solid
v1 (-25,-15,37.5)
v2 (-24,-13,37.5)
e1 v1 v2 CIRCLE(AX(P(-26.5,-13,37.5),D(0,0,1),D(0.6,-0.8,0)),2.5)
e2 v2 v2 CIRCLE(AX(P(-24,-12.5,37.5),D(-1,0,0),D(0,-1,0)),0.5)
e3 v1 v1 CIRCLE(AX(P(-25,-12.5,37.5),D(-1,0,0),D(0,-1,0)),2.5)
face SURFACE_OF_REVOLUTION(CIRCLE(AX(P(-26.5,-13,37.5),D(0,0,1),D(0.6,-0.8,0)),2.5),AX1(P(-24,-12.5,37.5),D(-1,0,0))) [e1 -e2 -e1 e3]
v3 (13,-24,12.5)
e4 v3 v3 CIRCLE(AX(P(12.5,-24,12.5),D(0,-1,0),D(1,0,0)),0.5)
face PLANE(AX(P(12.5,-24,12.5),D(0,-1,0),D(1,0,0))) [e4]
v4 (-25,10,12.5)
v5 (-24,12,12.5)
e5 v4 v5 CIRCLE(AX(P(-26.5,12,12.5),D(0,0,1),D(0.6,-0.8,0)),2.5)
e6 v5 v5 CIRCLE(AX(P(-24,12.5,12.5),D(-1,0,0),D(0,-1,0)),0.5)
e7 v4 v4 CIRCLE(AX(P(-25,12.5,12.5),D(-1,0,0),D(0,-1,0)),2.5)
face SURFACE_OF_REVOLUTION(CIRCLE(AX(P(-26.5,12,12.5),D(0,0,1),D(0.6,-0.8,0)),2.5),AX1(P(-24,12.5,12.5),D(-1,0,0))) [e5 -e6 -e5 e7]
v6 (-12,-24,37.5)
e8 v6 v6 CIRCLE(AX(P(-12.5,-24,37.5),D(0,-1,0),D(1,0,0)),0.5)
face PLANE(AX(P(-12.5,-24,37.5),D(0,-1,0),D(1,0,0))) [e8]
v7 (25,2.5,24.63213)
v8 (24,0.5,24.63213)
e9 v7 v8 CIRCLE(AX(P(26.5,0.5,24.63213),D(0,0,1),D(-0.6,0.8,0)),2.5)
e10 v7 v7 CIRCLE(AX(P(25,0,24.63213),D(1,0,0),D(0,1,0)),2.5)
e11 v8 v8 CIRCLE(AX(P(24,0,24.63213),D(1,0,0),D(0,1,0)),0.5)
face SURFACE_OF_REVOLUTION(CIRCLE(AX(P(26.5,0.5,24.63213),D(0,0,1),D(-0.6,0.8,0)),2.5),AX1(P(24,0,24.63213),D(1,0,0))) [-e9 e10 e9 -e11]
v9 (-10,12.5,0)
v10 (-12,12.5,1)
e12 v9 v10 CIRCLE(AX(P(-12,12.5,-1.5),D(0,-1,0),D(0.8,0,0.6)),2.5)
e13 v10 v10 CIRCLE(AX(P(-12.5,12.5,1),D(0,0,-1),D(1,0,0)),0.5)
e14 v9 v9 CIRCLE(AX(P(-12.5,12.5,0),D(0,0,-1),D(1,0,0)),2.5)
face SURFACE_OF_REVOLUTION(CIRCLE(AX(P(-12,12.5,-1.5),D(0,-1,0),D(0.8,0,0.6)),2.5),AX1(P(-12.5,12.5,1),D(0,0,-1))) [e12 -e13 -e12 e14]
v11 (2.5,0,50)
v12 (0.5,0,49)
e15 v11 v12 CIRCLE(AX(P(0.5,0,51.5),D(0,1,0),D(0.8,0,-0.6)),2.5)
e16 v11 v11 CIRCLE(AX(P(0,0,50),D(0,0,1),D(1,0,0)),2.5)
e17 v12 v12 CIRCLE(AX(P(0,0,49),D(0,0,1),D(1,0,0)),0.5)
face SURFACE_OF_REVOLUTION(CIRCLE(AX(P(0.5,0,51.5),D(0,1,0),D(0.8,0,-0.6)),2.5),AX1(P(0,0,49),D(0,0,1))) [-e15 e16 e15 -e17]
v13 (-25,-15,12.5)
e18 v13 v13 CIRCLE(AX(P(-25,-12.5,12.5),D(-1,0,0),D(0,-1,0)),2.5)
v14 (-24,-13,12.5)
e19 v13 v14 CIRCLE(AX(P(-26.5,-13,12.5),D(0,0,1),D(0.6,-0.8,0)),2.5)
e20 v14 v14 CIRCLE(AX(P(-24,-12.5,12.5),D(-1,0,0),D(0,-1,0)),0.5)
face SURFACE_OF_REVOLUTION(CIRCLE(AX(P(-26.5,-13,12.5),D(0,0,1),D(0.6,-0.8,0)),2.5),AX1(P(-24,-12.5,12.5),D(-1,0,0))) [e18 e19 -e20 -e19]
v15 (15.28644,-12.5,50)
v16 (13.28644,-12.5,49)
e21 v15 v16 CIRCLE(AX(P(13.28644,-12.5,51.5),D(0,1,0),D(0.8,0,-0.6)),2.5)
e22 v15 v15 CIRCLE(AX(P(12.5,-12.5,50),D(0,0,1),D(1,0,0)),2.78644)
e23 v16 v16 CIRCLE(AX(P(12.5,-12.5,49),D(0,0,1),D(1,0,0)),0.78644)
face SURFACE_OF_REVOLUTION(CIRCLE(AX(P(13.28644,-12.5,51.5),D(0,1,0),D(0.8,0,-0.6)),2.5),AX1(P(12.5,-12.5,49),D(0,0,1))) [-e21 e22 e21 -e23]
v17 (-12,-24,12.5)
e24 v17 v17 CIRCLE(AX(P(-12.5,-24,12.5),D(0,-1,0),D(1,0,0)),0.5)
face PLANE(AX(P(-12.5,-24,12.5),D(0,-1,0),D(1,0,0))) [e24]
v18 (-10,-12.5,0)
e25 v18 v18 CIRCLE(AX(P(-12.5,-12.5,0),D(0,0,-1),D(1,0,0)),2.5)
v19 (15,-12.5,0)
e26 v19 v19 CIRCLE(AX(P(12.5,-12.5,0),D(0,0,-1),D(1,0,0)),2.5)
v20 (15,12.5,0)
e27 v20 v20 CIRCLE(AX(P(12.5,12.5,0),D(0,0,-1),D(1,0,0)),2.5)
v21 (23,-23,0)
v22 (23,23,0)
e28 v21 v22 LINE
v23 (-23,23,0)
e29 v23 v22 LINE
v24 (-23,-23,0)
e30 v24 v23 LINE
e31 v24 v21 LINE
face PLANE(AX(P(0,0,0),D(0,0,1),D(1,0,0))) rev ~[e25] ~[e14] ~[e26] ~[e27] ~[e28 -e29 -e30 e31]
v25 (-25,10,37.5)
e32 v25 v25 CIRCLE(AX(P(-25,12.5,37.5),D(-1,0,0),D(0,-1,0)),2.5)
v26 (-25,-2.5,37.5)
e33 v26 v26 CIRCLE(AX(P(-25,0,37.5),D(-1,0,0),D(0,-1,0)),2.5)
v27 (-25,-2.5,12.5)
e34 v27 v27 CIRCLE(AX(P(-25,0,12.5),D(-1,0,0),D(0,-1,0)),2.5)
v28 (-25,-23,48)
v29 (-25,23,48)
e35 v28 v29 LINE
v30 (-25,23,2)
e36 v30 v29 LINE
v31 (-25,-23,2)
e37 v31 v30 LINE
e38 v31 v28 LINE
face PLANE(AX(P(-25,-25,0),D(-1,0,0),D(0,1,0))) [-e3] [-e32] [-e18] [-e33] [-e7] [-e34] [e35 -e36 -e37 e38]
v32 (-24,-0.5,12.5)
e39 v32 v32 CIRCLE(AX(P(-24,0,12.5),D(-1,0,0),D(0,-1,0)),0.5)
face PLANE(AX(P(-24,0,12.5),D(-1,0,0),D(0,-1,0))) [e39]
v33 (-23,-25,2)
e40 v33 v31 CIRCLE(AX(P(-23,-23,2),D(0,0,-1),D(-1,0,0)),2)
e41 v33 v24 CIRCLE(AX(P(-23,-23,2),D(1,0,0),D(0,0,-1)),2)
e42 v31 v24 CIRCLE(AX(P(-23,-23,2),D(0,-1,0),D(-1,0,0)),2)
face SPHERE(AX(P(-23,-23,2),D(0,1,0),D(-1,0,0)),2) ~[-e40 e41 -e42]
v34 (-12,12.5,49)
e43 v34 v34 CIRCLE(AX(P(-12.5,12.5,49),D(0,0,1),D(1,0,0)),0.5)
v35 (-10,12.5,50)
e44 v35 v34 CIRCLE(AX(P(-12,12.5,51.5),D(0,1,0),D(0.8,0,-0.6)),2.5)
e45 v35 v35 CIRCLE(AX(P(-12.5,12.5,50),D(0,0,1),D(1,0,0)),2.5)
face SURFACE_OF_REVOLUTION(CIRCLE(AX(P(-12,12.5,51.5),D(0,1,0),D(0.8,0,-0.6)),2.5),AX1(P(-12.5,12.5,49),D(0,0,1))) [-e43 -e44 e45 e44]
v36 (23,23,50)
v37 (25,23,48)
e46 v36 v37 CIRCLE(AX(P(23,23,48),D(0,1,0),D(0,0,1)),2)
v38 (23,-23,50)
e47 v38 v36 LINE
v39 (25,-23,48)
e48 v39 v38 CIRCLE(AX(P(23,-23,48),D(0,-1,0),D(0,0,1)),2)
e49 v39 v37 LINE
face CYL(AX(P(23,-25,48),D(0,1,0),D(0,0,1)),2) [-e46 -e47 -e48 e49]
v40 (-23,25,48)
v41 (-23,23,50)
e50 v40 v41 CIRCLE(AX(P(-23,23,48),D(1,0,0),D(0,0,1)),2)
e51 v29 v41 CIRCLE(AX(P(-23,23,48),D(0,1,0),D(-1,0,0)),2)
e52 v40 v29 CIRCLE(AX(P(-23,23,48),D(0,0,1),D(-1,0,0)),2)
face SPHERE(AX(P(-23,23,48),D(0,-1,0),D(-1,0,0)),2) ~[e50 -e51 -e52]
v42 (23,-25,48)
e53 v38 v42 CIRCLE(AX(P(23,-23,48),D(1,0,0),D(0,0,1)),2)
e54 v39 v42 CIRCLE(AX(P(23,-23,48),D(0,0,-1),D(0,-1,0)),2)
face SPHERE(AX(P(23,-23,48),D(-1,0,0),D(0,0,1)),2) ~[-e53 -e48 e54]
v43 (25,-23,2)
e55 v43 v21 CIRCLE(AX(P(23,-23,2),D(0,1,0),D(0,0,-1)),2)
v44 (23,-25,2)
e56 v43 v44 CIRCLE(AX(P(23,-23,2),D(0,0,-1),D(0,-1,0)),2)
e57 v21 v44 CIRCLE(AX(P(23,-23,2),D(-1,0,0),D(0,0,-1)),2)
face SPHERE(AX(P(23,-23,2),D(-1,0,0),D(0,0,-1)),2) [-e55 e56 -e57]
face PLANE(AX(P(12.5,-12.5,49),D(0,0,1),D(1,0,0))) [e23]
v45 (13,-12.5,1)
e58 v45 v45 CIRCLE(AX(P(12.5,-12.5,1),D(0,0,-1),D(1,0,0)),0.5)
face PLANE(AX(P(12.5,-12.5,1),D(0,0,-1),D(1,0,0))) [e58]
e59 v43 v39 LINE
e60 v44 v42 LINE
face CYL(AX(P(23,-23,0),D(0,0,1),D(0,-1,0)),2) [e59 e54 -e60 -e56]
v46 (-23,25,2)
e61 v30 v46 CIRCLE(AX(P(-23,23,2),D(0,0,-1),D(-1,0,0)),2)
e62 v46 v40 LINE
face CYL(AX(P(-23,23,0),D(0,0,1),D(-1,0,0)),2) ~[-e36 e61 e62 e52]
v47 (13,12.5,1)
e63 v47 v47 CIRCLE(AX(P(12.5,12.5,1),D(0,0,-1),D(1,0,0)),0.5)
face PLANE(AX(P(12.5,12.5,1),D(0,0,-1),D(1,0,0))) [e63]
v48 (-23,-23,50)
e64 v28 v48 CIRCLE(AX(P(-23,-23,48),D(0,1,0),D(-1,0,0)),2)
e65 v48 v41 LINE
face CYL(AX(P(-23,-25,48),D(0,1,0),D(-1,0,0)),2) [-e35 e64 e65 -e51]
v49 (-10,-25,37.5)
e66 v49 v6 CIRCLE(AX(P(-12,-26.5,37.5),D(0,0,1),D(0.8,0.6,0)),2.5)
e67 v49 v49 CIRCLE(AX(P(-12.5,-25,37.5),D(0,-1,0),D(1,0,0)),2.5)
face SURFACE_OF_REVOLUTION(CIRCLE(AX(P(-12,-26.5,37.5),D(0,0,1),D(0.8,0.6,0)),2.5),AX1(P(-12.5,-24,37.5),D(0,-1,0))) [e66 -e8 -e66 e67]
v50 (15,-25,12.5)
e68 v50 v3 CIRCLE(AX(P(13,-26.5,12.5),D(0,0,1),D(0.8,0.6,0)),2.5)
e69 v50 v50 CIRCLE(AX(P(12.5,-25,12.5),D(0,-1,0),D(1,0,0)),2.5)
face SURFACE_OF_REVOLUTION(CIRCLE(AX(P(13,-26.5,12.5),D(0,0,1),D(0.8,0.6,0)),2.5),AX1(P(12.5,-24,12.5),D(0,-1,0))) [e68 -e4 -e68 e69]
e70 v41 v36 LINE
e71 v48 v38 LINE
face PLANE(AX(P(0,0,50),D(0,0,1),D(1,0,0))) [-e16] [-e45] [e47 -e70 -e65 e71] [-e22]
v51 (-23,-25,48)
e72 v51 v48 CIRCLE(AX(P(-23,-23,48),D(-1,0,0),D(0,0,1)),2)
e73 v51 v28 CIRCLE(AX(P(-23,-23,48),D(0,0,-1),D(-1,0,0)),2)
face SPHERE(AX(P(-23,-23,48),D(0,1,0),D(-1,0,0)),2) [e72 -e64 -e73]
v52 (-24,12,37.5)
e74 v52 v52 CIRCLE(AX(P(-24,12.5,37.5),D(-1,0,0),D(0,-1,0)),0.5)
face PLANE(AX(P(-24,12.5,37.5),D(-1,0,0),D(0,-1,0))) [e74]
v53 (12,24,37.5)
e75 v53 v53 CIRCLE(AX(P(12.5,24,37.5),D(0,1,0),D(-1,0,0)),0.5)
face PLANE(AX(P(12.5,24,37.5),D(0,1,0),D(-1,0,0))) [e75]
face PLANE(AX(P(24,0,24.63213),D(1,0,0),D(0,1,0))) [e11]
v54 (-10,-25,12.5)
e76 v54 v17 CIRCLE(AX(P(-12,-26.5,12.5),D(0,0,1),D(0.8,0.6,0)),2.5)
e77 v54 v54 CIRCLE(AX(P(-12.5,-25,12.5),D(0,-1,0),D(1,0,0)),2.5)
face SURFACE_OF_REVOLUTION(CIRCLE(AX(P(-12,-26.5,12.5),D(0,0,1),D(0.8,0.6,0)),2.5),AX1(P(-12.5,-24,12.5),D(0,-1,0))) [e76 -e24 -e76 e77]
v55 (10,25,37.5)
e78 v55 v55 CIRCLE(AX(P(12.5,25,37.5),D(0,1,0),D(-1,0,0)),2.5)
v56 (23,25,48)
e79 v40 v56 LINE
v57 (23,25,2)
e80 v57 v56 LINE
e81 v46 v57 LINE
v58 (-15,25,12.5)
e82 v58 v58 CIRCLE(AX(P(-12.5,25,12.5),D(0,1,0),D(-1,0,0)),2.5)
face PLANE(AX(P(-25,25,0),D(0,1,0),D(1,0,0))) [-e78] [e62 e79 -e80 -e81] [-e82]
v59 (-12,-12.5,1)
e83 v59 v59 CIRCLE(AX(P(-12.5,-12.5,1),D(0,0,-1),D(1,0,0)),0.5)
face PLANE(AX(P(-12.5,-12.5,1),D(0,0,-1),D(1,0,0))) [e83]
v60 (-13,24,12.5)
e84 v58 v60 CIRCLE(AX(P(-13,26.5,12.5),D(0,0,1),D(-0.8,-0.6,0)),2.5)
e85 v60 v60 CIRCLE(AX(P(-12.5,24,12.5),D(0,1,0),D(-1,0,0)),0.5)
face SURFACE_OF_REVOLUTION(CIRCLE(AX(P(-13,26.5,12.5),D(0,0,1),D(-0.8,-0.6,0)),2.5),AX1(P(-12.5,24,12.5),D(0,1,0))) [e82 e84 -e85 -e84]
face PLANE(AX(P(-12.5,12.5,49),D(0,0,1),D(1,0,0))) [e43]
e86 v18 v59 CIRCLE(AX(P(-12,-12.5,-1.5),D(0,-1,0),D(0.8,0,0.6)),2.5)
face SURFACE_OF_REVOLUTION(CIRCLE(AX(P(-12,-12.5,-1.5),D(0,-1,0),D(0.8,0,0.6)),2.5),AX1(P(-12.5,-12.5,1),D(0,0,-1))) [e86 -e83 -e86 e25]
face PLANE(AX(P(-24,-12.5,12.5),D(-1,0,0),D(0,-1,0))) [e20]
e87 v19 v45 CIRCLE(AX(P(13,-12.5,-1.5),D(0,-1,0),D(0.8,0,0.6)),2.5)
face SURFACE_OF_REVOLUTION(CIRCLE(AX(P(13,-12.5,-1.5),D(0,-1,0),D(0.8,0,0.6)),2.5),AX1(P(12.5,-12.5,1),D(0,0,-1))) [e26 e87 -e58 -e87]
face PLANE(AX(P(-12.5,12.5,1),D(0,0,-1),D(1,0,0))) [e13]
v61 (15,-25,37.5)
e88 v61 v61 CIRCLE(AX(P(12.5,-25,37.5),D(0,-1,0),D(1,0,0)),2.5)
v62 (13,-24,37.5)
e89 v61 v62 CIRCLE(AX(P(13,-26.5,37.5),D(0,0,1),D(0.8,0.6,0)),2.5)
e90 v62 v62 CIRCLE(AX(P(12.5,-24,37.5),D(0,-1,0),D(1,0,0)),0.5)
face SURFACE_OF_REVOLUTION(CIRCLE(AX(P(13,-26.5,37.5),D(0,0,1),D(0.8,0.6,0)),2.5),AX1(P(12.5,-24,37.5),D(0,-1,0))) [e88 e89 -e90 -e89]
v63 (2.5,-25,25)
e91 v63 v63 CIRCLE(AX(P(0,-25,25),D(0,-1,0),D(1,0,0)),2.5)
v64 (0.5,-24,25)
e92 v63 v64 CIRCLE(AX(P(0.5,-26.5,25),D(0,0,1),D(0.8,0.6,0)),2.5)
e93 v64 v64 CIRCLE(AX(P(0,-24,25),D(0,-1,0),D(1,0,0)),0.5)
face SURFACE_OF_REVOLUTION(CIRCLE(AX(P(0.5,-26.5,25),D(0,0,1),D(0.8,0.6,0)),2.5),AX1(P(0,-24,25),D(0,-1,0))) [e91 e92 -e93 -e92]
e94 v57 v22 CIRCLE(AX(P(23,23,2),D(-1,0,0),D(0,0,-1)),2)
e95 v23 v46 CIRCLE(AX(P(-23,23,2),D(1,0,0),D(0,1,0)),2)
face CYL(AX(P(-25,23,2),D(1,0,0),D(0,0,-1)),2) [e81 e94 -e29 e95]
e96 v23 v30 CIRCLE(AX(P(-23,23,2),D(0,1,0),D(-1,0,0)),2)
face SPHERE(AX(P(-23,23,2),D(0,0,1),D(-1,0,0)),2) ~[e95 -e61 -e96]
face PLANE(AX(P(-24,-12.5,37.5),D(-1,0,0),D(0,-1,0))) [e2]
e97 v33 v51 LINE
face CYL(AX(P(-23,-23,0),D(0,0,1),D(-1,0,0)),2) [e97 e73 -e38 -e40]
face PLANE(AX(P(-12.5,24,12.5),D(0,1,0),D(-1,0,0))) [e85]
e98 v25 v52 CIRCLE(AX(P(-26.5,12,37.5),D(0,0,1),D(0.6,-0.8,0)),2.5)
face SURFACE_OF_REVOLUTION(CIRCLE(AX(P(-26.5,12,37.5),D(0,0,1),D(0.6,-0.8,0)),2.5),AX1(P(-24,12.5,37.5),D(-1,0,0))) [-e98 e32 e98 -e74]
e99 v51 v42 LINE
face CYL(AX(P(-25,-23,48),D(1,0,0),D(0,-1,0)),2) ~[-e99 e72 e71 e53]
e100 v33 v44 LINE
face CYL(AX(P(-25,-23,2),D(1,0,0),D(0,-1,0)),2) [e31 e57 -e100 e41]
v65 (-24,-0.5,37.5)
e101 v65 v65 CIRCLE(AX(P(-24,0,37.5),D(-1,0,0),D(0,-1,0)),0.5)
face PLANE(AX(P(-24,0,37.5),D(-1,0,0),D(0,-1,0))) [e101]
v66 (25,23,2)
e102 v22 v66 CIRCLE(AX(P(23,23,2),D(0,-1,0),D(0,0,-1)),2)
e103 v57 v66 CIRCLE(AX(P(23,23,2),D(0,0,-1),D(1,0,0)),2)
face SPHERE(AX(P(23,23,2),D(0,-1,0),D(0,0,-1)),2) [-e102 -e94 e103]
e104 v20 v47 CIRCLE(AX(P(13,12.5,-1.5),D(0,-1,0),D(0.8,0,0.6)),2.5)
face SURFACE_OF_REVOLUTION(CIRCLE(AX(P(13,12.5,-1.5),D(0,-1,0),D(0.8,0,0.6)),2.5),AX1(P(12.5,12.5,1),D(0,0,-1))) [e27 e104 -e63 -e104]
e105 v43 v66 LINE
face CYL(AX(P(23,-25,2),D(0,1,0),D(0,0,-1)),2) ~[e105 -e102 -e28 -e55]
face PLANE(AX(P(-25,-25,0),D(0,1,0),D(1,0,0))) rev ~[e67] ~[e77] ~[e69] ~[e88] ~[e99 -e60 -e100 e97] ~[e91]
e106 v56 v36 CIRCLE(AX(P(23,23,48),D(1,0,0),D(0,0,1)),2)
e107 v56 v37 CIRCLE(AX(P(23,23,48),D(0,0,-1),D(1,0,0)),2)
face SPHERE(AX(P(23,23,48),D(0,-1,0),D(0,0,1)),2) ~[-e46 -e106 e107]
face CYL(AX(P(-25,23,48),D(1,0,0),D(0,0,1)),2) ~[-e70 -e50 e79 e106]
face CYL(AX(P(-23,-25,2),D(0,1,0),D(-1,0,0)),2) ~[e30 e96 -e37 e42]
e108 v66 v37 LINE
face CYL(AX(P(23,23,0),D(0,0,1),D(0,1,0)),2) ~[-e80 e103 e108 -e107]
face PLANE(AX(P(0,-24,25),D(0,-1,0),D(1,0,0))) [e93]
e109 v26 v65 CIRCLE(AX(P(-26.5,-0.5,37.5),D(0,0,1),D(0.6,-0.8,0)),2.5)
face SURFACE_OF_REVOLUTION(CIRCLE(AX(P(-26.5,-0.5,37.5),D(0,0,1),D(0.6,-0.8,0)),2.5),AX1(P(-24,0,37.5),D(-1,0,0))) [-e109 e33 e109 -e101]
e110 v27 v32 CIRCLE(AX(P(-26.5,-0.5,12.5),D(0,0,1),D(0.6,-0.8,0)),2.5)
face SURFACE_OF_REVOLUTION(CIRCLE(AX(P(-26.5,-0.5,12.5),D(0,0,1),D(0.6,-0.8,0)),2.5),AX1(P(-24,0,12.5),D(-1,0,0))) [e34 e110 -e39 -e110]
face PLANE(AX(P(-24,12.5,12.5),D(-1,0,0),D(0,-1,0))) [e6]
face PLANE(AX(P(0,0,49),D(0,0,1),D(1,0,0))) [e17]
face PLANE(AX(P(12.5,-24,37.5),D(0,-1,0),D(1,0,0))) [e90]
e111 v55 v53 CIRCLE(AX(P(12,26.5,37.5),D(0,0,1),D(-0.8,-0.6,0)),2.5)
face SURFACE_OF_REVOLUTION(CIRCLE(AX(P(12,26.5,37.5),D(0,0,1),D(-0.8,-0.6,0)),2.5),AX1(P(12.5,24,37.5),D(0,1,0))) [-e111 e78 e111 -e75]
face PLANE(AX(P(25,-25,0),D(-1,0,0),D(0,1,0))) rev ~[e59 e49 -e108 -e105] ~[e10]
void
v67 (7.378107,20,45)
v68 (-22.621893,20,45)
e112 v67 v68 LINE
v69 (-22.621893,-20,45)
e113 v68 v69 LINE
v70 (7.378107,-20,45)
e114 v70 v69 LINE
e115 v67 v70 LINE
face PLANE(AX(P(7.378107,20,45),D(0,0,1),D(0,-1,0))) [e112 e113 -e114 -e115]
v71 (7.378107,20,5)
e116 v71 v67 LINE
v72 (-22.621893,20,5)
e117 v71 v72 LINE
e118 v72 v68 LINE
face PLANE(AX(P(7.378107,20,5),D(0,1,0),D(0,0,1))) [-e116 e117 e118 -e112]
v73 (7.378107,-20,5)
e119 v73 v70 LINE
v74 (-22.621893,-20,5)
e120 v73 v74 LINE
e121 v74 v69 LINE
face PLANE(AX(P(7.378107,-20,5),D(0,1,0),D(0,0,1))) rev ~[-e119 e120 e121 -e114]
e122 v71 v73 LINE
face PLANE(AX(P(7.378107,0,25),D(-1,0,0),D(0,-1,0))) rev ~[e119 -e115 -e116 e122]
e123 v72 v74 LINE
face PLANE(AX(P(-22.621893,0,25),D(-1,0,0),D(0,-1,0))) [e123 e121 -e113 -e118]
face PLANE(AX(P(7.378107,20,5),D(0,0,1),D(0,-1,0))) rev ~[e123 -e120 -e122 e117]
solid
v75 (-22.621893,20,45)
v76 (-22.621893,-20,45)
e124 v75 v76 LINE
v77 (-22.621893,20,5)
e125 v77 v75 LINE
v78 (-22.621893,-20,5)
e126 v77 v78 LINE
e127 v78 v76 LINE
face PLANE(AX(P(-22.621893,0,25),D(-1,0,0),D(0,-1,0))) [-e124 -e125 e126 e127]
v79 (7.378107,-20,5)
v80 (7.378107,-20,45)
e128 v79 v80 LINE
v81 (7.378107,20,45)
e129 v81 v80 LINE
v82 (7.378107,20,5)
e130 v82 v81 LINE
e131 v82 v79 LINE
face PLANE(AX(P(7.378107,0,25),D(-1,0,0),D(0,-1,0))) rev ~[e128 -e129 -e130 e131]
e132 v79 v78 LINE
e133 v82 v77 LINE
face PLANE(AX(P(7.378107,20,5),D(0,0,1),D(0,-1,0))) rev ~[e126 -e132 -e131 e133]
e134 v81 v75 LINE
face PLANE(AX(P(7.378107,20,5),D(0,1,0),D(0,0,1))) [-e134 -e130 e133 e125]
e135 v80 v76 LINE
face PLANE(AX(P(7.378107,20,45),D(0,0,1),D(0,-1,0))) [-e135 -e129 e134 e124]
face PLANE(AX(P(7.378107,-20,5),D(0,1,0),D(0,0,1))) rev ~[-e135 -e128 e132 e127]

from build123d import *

# Parameters (mm, degrees)
F0_W      = 50
F0_H      = 50
F1_DEPTH  = 50
F3_R      = 2.5
F6_DEPTH  = 1
F5_R      = 2.5
F7_DEPTH  = 1
F2_R      = 2.786439664
F2_R_2    = 2.5
F8_DEPTH  = 1
F9_R      = 2.5
F10_DEPTH = 1
F4_R      = 2.5
F11_DEPTH = 1
F12_R     = 2.5
F13_DEPTH = 1
F16_W     = 40
F16_H     = 40
F17_DEPTH = 30
F18_DEPTH = 30
F19_R     = 2


# Not quite as in the source:
# - a fillet or chamfer that OpenCascade refuses, or shapes differently, is made with other operations: its cross-section is extruded or revolved along the edge and cut away or added


with BuildPart() as f1:
    # F0 (on Top) → F1 (new body)
    with BuildSketch(Plane.XY):
        Rectangle(F0_W, F0_H)
    extrude(amount=F1_DEPTH)

    # F3 (on face) → F6 (cut)
    with BuildSketch(Plane(origin=(-25, 0, 0), x_dir=(0, -1, 0), z_dir=(-1, 0, 0))):
        with Locations((0, 37.5)):
            Circle(F3_R)
        with Locations((12.5, 37.5)):
            Circle(F3_R)
        with Locations((12.5, 12.5)):
            Circle(F3_R)
        with Locations((0, 12.5)):
            Circle(F3_R)
        with Locations((-12.5, 12.5)):
            Circle(F3_R)
        with Locations((-12.5, 37.5)):
            Circle(F3_R)
    extrude(amount=-F6_DEPTH, mode=Mode.SUBTRACT)

    # F5 (on face) → F7 (cut)
    with BuildSketch(Plane.YZ.offset(25)):
        with Locations((0, 24.6321298182)):
            Circle(F5_R)
    extrude(amount=-F7_DEPTH, mode=Mode.SUBTRACT)

    # F2 (on face) → F8 (cut)
    with BuildSketch(Plane.XY.offset(50)):
        with Locations((12.5, -12.5)):
            Circle(F2_R)
        Circle(F2_R_2)
        with Locations((-12.5, 12.5)):
            Circle(F2_R_2)
    extrude(amount=-F8_DEPTH, mode=Mode.SUBTRACT)

    # F9 (on face) → F10 (cut)
    with BuildSketch(Plane(origin=(0, 0, 0), x_dir=(1, 0, 0), z_dir=(0, 0, -1))):
        with Locations((12.5, 12.5)):
            Circle(F9_R)
        with Locations((12.5, -12.5)):
            Circle(F9_R)
        with Locations((-12.5, -12.5)):
            Circle(F9_R)
        with Locations((-12.5, 12.5)):
            Circle(F9_R)
    extrude(amount=-F10_DEPTH, mode=Mode.SUBTRACT)

    # F4 (on face) → F11 (cut)
    with BuildSketch(Plane.XZ.offset(25)):
        with Locations((-12.5, 37.5)):
            Circle(F4_R)
        with Locations((12.5, 12.5)):
            Circle(F4_R)
        with Locations((12.5, 37.5)):
            Circle(F4_R)
        with Locations((0, 25)):
            Circle(F4_R)
        with Locations((-12.5, 12.5)):
            Circle(F4_R)
    extrude(amount=-F11_DEPTH, mode=Mode.SUBTRACT)

    # F12 (on face) → F13 (cut)
    with BuildSketch(Plane(origin=(0, 25, 0), x_dir=(-1, 0, 0), z_dir=(0, 1, 0))):
        with Locations((-12.5, 37.5)):
            Circle(F12_R)
        with Locations((12.5, 12.5)):
            Circle(F12_R)
    extrude(amount=-F13_DEPTH, mode=Mode.SUBTRACT)

    # F16 (on line) → F17 (cut)
    with BuildSketch(Plane(origin=(7.3781074025, 0, 0), x_dir=(0, -1, 0), z_dir=(-1, 0, 0))):
        with Locations((0, 25)):
            Rectangle(F16_W, F16_H)
    extrude(amount=F17_DEPTH, mode=Mode.SUBTRACT)

    # F19
    f19_edges = [f1.edges().sort_by_distance(p)[0] for p in [
        (-25, 0, 50),
        (-25, 25, 25),
        (-25, 0, 0),
        (-25, -25, 25),
        (0, -25, 50),
        (25, 0, 50),
        (0, 25, 50),
        (0, -25, 0),
        (25, 0, 0),
        (0, 25, 0),
        (25, 25, 25),
        (25, -25, 25),
    ]]
    fillet(f19_edges, radius=F19_R)

    # F20: fillet of radius 2.5 on 21 edges, made by hand

    # F20_s1 → F20_t2 (revolve)
    with BuildSketch(Plane.XZ.offset(-12.5)):
        with BuildLine():
            ThreePointArc((-10, 50), (-10.8819660113, 49.2639320225), (-12, 49))
            Line((-12, 49), (-10, 49))
            Line((-10, 49), (-10, 50))
        make_face()
    revolve(axis=Axis((-12.5, 12.5, 49), (0, 0, 1)))

    # F20_s3 → F20_t4 (revolve)
    with BuildSketch(Plane.XZ.offset(12.5)):
        with BuildLine():
            ThreePointArc((15.286439664, 50), (14.4044736528, 49.2639320225), (13.286439664, 49))
            Line((13.286439664, 49), (15.286439664, 49))
            Line((15.286439664, 49), (15.286439664, 50))
        make_face()
    revolve(axis=Axis((12.5, -12.5, 49), (0, 0, 1)))

    # F20_s5 → F20_t6 (revolve)
    with BuildSketch(Plane.XZ):
        with BuildLine():
            ThreePointArc((2.5, 50), (1.6180339887, 49.2639320225), (0.5, 49))
            Line((0.5, 49), (2.5, 49))
            Line((2.5, 49), (2.5, 50))
        make_face()
    revolve(axis=Axis((0, 0, 49), (0, 0, 1)))

    # F20_s7 → F20_t8 (revolve)
    with BuildSketch(Plane.XY.offset(37.5)):
        with BuildLine():
            ThreePointArc((10, 25), (10.8819660113, 24.2639320225), (12, 24))
            Line((12, 24), (10, 24))
            Line((10, 24), (10, 25))
        make_face()
    revolve(axis=Axis((12.5, 24, 37.5), (0, 1, 0)))

    # F20_s9 → F20_t10 (revolve)
    with BuildSketch(Plane.XY.offset(12.5)):
        with BuildLine():
            ThreePointArc((-15, 25), (-14.1180339887, 24.2639320225), (-13, 24))
            Line((-13, 24), (-15, 24))
            Line((-15, 24), (-15, 25))
        make_face()
    revolve(axis=Axis((-12.5, 24, 12.5), (0, 1, 0)))

    # F20_s11 → F20_t12 (revolve)
    with BuildSketch(Plane.XY.offset(37.5)):
        with BuildLine():
            ThreePointArc((-25, 10), (-24.2639320225, 10.8819660113), (-24, 12))
            Line((-24, 12), (-24, 10))
            Line((-24, 10), (-25, 10))
        make_face()
    revolve(axis=Axis((-24, 12.5, 37.5), (-1, 0, 0)))

    # F20_s13 → F20_t14 (revolve)
    with BuildSketch(Plane.XY.offset(12.5)):
        with BuildLine():
            ThreePointArc((-25, -2.5), (-24.2639320225, -1.6180339887), (-24, -0.5))
            Line((-24, -0.5), (-24, -2.5))
            Line((-24, -2.5), (-25, -2.5))
        make_face()
    revolve(axis=Axis((-24, 0, 12.5), (-1, 0, 0)))

    # F20_s15 → F20_t16 (revolve)
    with BuildSketch(Plane.XY.offset(12.5)):
        with BuildLine():
            ThreePointArc((-25, 10), (-24.2639320225, 10.8819660113), (-24, 12))
            Line((-24, 12), (-24, 10))
            Line((-24, 10), (-25, 10))
        make_face()
    revolve(axis=Axis((-24, 12.5, 12.5), (-1, 0, 0)))

    # F20_s17 → F20_t18 (revolve)
    with BuildSketch(Plane.XY.offset(37.5)):
        with BuildLine():
            ThreePointArc((-25, -2.5), (-24.2639320225, -1.6180339887), (-24, -0.5))
            Line((-24, -0.5), (-24, -2.5))
            Line((-24, -2.5), (-25, -2.5))
        make_face()
    revolve(axis=Axis((-24, 0, 37.5), (-1, 0, 0)))

    # F20_s19 → F20_t20 (revolve)
    with BuildSketch(Plane.XY.offset(37.5)):
        with BuildLine():
            ThreePointArc((-25, -15), (-24.2639320225, -14.1180339887), (-24, -13))
            Line((-24, -13), (-24, -15))
            Line((-24, -15), (-25, -15))
        make_face()
    revolve(axis=Axis((-24, -12.5, 37.5), (-1, 0, 0)))

    # F20_s21 → F20_t22 (revolve)
    with BuildSketch(Plane.XY.offset(12.5)):
        with BuildLine():
            ThreePointArc((-25, -15), (-24.2639320225, -14.1180339887), (-24, -13))
            Line((-24, -13), (-24, -15))
            Line((-24, -15), (-25, -15))
        make_face()
    revolve(axis=Axis((-24, -12.5, 12.5), (-1, 0, 0)))

    # F20_s23 → F20_t24 (revolve)
    with BuildSketch(Plane.XZ.offset(12.5)):
        with BuildLine():
            ThreePointArc((15, 0), (14.1180339887, 0.7360679775), (13, 1))
            Line((13, 1), (15, 1))
            Line((15, 1), (15, 0))
        make_face()
    revolve(axis=Axis((12.5, -12.5, 1), (0, 0, -1)))

    # F20_s25 → F20_t26 (revolve)
    with BuildSketch(Plane.XZ.offset(-12.5)):
        with BuildLine():
            ThreePointArc((15, 0), (14.1180339887, 0.7360679775), (13, 1))
            Line((13, 1), (15, 1))
            Line((15, 1), (15, 0))
        make_face()
    revolve(axis=Axis((12.5, 12.5, 1), (0, 0, -1)))

    # F20_s27 → F20_t28 (revolve)
    with BuildSketch(Plane.XY.offset(12.5)):
        with BuildLine():
            ThreePointArc((-10, -25), (-10.8819660113, -24.2639320225), (-12, -24))
            Line((-12, -24), (-10, -24))
            Line((-10, -24), (-10, -25))
        make_face()
    revolve(axis=Axis((-12.5, -24, 12.5), (0, -1, 0)))

    # F20_s29 → F20_t30 (revolve)
    with BuildSketch(Plane.XZ.offset(12.5)):
        with BuildLine():
            ThreePointArc((-10, 0), (-10.8819660113, 0.7360679775), (-12, 1))
            Line((-12, 1), (-10, 1))
            Line((-10, 1), (-10, 0))
        make_face()
    revolve(axis=Axis((-12.5, -12.5, 1), (0, 0, -1)))

    # F20_s31 → F20_t32 (revolve)
    with BuildSketch(Plane.XZ.offset(-12.5)):
        with BuildLine():
            ThreePointArc((-10, 0), (-10.8819660113, 0.7360679775), (-12, 1))
            Line((-12, 1), (-10, 1))
            Line((-10, 1), (-10, 0))
        make_face()
    revolve(axis=Axis((-12.5, 12.5, 1), (0, 0, -1)))

    # F20_s33 → F20_t34 (revolve)
    with BuildSketch(Plane.XY.offset(24.6321298182)):
        with BuildLine():
            ThreePointArc((25, 2.5), (24.2639320225, 1.6180339887), (24, 0.5))
            Line((24, 0.5), (24, 2.5))
            Line((24, 2.5), (25, 2.5))
        make_face()
    revolve(axis=Axis((24, 0, 24.6321298182), (1, 0, 0)))

    # F20_s35 → F20_t36 (revolve)
    with BuildSketch(Plane.XY.offset(25)):
        with BuildLine():
            ThreePointArc((2.5, -25), (1.6180339887, -24.2639320225), (0.5, -24))
            Line((0.5, -24), (2.5, -24))
            Line((2.5, -24), (2.5, -25))
        make_face()
    revolve(axis=Axis((0, -24, 25), (0, -1, 0)))

    # F20_s37 → F20_t38 (revolve)
    with BuildSketch(Plane.XY.offset(12.5)):
        with BuildLine():
            ThreePointArc((15, -25), (14.1180339887, -24.2639320225), (13, -24))
            Line((13, -24), (15, -24))
            Line((15, -24), (15, -25))
        make_face()
    revolve(axis=Axis((12.5, -24, 12.5), (0, -1, 0)))

    # F20_s39 → F20_t40 (revolve)
    with BuildSketch(Plane.XY.offset(37.5)):
        with BuildLine():
            ThreePointArc((15, -25), (14.1180339887, -24.2639320225), (13, -24))
            Line((13, -24), (15, -24))
            Line((15, -24), (15, -25))
        make_face()
    revolve(axis=Axis((12.5, -24, 37.5), (0, -1, 0)))

    # F20_s41 → F20_t42 (revolve)
    with BuildSketch(Plane.XY.offset(37.5)):
        with BuildLine():
            ThreePointArc((-10, -25), (-10.8819660113, -24.2639320225), (-12, -24))
            Line((-12, -24), (-10, -24))
            Line((-10, -24), (-10, -25))
        make_face()
    revolve(axis=Axis((-12.5, -24, 37.5), (0, -1, 0)))


with BuildPart() as f18:
    # F16 (on line) → F18 (new body)
    with BuildSketch(Plane(origin=(7.3781074025, 0, 0), x_dir=(0, -1, 0), z_dir=(-1, 0, 0))):
        with Locations((0, 25)):
            Rectangle(F16_W, F16_H)
    extrude(amount=F18_DEPTH)


solid = Compound([f1.part, f18.part])
